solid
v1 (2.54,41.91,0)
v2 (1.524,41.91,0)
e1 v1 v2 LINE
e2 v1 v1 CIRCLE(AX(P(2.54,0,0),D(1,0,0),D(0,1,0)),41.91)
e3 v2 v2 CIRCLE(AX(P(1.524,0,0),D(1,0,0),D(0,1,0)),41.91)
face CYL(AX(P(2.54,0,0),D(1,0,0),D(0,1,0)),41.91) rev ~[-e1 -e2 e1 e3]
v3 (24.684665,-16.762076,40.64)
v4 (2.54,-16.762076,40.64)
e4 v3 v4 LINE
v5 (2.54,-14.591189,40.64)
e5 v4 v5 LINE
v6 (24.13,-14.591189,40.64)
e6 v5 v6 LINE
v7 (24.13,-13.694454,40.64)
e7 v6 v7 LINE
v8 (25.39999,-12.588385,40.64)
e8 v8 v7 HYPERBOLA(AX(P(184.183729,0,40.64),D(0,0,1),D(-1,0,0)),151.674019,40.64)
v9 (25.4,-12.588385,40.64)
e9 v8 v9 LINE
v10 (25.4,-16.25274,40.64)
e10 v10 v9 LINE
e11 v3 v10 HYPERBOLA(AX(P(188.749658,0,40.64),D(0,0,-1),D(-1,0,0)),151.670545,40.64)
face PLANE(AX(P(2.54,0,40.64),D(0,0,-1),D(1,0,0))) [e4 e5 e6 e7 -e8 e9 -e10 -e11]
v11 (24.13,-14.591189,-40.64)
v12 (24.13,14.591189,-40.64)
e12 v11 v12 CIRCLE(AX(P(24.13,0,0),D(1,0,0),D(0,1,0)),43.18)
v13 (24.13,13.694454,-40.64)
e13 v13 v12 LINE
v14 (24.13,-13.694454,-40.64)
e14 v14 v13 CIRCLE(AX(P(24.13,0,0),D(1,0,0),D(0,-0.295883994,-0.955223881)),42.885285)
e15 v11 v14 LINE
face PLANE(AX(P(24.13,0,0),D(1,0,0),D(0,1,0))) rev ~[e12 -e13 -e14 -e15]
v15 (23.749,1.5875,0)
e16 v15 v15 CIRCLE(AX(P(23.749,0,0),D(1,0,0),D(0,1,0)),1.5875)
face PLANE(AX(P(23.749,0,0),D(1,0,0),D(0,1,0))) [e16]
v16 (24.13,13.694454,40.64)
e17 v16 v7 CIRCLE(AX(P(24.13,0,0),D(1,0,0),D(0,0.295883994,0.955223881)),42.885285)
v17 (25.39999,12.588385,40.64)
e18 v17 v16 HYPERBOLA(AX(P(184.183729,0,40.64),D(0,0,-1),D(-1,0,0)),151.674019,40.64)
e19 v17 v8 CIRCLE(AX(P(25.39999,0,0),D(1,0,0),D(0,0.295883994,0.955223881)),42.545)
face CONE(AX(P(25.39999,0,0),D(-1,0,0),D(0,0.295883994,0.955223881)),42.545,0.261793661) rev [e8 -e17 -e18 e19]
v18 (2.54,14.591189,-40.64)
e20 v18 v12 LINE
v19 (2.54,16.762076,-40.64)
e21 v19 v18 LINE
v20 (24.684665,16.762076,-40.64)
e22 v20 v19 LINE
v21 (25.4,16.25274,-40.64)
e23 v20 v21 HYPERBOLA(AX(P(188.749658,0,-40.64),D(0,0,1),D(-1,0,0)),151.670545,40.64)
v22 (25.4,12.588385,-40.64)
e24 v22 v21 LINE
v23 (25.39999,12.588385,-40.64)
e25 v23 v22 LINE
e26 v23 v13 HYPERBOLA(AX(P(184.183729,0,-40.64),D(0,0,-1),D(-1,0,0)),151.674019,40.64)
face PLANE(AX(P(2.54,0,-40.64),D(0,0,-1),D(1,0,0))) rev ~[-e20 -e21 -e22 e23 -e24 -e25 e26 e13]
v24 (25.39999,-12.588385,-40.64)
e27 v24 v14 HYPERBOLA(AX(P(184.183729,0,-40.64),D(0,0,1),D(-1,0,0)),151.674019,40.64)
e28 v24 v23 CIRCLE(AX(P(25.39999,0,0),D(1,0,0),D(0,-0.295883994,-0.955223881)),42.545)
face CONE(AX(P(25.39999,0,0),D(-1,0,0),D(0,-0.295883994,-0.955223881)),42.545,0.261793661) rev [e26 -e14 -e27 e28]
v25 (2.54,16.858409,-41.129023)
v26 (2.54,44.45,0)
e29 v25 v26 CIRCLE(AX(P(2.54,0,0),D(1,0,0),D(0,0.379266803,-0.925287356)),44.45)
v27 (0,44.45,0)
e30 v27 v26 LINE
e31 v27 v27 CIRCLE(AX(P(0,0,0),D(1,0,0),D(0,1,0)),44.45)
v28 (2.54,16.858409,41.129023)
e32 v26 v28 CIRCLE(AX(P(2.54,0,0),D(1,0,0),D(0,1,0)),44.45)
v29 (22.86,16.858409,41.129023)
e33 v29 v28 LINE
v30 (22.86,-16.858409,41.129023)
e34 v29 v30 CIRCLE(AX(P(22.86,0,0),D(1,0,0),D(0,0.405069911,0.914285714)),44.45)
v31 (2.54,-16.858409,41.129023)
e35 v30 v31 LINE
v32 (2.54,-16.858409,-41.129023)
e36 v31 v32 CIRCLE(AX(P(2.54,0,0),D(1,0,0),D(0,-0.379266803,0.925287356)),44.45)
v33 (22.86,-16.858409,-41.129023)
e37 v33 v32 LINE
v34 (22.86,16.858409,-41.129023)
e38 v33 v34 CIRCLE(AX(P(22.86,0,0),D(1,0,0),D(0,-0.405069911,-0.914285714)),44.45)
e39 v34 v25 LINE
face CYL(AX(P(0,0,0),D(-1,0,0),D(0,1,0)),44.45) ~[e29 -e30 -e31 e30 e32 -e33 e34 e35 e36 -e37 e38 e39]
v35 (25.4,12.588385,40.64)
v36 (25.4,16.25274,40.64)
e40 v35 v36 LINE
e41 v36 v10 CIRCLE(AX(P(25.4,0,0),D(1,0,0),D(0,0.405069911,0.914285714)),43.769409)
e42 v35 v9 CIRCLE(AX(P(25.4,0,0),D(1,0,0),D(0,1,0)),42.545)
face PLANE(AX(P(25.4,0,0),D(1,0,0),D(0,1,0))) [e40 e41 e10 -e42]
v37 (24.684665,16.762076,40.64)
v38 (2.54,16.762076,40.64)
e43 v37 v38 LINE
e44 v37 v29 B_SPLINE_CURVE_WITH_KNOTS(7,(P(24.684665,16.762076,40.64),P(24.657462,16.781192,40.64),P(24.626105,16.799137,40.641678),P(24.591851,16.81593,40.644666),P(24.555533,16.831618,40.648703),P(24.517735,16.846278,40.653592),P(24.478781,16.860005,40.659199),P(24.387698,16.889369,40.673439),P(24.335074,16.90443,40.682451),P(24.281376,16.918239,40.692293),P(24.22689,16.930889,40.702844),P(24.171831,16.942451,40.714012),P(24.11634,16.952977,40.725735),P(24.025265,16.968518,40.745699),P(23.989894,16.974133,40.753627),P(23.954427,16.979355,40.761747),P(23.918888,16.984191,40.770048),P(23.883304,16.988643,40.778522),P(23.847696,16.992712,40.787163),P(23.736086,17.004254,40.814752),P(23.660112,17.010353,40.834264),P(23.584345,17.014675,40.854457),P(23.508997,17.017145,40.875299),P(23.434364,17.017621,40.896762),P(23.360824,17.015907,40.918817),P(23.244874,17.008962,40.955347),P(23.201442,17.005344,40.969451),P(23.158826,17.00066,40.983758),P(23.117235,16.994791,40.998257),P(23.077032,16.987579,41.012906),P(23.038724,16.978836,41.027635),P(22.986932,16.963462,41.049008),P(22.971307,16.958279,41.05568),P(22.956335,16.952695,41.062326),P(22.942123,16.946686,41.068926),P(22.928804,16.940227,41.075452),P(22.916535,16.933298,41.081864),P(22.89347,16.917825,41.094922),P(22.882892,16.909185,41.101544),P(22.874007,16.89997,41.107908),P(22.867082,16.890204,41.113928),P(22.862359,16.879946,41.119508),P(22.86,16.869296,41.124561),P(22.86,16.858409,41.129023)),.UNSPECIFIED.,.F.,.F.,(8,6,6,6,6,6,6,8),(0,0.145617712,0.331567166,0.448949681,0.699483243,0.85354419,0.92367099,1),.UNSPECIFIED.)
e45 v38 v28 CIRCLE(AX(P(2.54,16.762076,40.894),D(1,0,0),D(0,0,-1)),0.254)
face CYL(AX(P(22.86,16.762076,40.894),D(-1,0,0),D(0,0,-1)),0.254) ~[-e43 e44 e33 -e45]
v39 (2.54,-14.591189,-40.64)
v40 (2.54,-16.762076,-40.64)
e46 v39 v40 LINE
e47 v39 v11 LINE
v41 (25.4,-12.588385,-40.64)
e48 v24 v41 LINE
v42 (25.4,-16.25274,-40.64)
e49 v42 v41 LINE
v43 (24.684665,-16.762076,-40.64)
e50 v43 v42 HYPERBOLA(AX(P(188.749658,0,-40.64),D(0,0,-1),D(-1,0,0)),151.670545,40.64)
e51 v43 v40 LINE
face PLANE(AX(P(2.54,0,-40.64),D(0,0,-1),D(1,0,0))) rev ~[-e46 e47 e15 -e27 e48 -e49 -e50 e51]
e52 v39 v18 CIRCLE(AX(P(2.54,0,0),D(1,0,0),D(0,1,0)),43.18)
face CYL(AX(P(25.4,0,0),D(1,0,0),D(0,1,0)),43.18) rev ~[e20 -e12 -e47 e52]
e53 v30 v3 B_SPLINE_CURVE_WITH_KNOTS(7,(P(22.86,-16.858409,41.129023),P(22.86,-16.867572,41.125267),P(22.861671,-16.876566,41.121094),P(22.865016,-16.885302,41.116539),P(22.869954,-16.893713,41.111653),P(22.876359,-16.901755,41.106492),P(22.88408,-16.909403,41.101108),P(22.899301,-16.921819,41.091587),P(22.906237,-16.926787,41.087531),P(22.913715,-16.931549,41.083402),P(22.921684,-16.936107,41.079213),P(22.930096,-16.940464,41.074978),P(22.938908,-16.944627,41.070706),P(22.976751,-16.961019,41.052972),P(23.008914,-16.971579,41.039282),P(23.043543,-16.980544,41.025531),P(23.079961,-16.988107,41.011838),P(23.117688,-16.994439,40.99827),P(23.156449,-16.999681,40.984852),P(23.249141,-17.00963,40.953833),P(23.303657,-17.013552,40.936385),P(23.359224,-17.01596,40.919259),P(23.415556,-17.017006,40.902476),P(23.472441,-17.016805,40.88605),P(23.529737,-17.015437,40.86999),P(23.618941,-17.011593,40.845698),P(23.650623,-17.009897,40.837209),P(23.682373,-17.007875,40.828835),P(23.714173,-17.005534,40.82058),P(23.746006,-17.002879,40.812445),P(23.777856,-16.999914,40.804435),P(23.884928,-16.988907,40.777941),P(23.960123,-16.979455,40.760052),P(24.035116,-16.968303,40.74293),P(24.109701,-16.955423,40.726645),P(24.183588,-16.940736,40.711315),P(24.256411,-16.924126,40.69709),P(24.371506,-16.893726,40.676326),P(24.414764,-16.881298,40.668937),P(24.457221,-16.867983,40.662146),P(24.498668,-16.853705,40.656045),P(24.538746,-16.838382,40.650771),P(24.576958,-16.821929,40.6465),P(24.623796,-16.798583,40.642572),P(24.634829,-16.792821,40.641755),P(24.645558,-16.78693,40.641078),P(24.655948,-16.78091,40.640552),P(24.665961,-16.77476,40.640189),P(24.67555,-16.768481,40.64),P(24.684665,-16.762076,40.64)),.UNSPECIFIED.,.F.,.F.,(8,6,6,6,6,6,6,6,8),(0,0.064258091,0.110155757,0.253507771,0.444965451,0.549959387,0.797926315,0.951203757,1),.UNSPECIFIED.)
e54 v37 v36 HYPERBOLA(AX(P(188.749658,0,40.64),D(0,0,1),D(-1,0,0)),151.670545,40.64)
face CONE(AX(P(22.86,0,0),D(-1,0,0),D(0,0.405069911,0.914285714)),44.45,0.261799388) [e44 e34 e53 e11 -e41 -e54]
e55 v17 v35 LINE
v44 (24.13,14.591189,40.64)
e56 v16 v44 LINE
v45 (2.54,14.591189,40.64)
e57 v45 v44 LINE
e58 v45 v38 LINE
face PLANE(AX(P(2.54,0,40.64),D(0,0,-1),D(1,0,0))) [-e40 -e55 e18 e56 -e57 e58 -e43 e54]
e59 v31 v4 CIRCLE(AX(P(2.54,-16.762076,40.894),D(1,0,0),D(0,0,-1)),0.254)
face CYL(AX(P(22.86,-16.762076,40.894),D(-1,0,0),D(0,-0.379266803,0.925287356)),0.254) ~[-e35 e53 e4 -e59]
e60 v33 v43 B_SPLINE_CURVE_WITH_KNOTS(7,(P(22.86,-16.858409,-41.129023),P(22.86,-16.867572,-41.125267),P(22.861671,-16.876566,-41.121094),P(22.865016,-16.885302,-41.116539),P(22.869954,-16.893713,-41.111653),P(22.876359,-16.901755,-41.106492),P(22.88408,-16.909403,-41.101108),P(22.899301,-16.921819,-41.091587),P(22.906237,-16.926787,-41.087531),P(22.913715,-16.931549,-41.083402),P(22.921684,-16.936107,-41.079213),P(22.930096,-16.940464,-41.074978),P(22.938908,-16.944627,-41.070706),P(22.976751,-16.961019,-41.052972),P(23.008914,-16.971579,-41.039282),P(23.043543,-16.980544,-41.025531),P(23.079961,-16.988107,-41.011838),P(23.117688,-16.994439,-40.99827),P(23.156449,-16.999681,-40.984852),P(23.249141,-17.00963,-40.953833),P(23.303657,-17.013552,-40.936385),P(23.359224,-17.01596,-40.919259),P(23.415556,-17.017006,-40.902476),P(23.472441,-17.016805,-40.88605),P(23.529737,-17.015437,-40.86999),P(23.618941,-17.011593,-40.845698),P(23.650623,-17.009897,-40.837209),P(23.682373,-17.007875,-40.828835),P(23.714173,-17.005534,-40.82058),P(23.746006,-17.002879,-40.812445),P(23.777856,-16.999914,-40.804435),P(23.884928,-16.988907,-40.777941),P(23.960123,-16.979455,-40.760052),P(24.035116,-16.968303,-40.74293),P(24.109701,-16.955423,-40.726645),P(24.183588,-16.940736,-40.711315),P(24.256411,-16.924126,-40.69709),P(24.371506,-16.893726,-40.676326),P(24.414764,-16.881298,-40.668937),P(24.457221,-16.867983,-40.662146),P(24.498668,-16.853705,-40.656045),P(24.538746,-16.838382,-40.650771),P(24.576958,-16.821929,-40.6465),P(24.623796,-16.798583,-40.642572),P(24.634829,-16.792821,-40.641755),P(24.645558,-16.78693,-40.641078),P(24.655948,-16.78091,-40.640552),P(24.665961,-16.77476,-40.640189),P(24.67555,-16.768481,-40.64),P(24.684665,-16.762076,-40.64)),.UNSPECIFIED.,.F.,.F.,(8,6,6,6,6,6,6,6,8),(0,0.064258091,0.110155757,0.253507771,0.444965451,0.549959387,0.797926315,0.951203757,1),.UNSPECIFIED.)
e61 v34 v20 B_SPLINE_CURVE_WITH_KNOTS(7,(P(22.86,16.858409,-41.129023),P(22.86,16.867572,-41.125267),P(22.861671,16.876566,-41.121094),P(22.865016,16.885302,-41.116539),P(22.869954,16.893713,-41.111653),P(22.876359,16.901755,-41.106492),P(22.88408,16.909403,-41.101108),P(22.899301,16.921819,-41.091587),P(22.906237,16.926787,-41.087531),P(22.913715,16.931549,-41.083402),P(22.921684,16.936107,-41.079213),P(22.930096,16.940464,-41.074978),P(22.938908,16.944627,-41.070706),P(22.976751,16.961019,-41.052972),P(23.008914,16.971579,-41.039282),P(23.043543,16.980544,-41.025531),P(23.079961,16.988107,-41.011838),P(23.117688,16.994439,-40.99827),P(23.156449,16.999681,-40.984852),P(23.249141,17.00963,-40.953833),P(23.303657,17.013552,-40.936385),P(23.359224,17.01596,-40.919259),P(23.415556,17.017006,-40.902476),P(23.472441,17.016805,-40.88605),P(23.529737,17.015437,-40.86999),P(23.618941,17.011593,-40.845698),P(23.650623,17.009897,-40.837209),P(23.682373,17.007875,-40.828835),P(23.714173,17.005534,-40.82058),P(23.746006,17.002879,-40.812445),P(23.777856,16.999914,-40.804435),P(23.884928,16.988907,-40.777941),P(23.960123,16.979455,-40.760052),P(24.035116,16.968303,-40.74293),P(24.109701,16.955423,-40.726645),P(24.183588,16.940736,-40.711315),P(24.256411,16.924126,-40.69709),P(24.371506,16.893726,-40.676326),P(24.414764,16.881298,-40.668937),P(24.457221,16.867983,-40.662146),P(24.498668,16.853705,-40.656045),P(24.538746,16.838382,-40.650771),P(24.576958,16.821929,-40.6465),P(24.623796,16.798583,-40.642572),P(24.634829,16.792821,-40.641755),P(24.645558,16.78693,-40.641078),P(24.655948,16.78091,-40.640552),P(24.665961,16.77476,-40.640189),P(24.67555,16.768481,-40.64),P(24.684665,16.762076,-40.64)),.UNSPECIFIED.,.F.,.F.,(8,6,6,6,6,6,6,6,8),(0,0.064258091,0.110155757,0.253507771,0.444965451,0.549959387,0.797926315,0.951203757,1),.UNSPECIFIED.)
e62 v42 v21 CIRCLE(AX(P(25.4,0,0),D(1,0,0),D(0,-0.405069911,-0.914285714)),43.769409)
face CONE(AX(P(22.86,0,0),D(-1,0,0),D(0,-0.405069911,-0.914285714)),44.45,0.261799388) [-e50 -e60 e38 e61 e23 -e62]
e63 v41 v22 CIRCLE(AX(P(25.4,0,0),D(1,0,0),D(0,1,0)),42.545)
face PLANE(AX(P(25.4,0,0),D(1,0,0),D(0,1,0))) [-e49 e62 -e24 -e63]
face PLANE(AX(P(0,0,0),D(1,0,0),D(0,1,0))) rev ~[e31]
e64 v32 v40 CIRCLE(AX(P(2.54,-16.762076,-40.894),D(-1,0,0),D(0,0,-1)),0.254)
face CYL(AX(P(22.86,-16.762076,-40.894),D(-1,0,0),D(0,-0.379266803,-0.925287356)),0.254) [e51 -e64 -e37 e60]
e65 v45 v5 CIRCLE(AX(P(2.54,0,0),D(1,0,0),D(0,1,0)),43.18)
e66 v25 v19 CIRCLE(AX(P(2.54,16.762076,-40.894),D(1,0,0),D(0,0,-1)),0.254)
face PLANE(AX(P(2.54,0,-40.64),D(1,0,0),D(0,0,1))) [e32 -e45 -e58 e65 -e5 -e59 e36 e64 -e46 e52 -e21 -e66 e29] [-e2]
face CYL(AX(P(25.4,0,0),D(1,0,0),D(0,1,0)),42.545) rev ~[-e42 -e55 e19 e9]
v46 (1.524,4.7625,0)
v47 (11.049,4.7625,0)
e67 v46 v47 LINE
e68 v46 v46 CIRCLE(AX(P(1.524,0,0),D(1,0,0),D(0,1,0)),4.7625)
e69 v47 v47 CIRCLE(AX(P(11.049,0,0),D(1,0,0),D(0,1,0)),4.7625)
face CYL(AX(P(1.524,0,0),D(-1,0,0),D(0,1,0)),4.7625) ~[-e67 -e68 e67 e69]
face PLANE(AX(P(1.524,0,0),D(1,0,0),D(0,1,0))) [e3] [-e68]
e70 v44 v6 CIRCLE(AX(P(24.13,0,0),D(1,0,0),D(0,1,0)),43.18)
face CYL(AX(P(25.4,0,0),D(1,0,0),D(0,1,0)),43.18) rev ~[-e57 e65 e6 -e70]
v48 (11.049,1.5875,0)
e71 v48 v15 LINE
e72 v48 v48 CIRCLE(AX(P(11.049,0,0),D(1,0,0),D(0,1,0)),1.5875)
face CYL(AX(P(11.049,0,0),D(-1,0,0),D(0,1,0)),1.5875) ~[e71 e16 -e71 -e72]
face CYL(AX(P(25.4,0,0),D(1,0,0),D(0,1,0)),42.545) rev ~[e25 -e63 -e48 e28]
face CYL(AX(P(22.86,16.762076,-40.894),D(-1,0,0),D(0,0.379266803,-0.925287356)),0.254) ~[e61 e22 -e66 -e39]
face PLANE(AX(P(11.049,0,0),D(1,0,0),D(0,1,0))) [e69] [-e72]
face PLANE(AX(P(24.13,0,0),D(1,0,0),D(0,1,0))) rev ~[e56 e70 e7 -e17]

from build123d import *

# Parameters (mm, degrees)
F0_R       = 44.45
F1_DEPTH   = 25.4
F2_R       = 43.18
F3_DEPTH   = 22.86
F4_R       = 44.45
F4_R_2     = 42.545
F5_DEPTH   = 1.27
F6_W       = 25.4
F6_H       = 81.28
F7_DEPTH   = 63.5
F8_SIZE2   = 0.340285
F8_SIZE    = 1.26999
F8_2_SIZE2 = 0.340285
F8_2_SIZE  = 1.26999
F9_SIZE2   = 0.6805909488
F9_SIZE    = 2.54
F10_R      = 0.254
F11_R      = 41.91
F12_DEPTH  = 1.016
F13_R      = 4.7625
F14_DEPTH  = 9.525
F15_R      = 1.5875
F16_DEPTH  = 12.7


# Not quite as in the source:
# - a fillet or chamfer is up to 0.001 mm smaller than in the source, because OpenCascade refuses the exact size


with BuildPart() as f1:
    # F0 (on Right) → F1 (new body)
    with BuildSketch(Plane.YZ):
        Circle(F0_R)
    extrude(amount=F1_DEPTH)

    # F2 (on face) → F3 (cut)
    with BuildSketch(Plane.YZ.offset(25.4)):
        Circle(F2_R)
    extrude(amount=-F3_DEPTH, mode=Mode.SUBTRACT)

    # F4 (on face) → F5 (join)
    with BuildSketch(Plane.YZ.offset(25.4)):
        Circle(F4_R)
        Circle(F4_R_2, mode=Mode.SUBTRACT)
    extrude(amount=-F5_DEPTH)

    # F6 (on Front) → F7 (cut, symmetric)
    with BuildSketch(Plane.XZ):
        with Locations((15.24, 0)):
            Rectangle(F6_W, F6_H)
    extrude(amount=F7_DEPTH, both=True, mode=Mode.SUBTRACT)

    # F8 (size 1.27 and 0.3402954744 in the source; OpenCascade refuses exactly that, so slightly less here)
    f8_edges = [f1.edges().sort_by_distance(p)[0] for p in [
        (24.13, 0, -42.545),
    ]]
    f8_side = f1.faces().sort_by_distance((24.765, 0, -42.545))[0]
    chamfer(f8_edges, length=F8_SIZE, length2=F8_SIZE2, reference=f8_side)

    # F8#2 (size 1.27 and 0.3402954744 in the source; OpenCascade refuses exactly that, so slightly less here)
    f8_2_edges = [f1.edges().sort_by_distance(p)[0] for p in [
        (24.13, 0, 42.545),
    ]]
    f8_2_side = f1.faces().sort_by_distance((24.765, 0, 42.545))[0]
    chamfer(f8_2_edges, length=F8_2_SIZE, length2=F8_2_SIZE2, reference=f8_2_side)

    # F9
    f9_edges = [f1.edges().sort_by_distance(p)[0] for p in [
        (25.4, 0, -44.45),
        (25.4, 0, 44.45),
    ]]
    f9_side = f1.faces().sort_by_distance((1.257363, 37.256816, -24.243188))[0]
    chamfer(f9_edges, length=F9_SIZE, length2=F9_SIZE2, reference=f9_side)

    # F10
    f10_edges = [f1.edges().sort_by_distance(p)[0] for p in [
        (12.7, 18.005358, -40.64),
        (12.7, -18.005358, -40.64),
        (12.7, -18.005358, 40.64),
        (12.7, 18.005358, 40.64),
    ]]
    fillet(f10_edges, radius=F10_R)

    # F11 (on face) → F12 (cut)
    with BuildSketch(Plane.YZ.offset(2.54)):
        Circle(F11_R)
    extrude(amount=-F12_DEPTH, mode=Mode.SUBTRACT)

    # F13 (on face) → F14 (join)
    with BuildSketch(Plane.YZ.offset(1.524)):
        Circle(F13_R)
    extrude(amount=F14_DEPTH)

    # F15 (on face) → F16 (join)
    with BuildSketch(Plane.YZ.offset(11.049)):
        Circle(F15_R)
    extrude(amount=F16_DEPTH)


solid = f1.part
